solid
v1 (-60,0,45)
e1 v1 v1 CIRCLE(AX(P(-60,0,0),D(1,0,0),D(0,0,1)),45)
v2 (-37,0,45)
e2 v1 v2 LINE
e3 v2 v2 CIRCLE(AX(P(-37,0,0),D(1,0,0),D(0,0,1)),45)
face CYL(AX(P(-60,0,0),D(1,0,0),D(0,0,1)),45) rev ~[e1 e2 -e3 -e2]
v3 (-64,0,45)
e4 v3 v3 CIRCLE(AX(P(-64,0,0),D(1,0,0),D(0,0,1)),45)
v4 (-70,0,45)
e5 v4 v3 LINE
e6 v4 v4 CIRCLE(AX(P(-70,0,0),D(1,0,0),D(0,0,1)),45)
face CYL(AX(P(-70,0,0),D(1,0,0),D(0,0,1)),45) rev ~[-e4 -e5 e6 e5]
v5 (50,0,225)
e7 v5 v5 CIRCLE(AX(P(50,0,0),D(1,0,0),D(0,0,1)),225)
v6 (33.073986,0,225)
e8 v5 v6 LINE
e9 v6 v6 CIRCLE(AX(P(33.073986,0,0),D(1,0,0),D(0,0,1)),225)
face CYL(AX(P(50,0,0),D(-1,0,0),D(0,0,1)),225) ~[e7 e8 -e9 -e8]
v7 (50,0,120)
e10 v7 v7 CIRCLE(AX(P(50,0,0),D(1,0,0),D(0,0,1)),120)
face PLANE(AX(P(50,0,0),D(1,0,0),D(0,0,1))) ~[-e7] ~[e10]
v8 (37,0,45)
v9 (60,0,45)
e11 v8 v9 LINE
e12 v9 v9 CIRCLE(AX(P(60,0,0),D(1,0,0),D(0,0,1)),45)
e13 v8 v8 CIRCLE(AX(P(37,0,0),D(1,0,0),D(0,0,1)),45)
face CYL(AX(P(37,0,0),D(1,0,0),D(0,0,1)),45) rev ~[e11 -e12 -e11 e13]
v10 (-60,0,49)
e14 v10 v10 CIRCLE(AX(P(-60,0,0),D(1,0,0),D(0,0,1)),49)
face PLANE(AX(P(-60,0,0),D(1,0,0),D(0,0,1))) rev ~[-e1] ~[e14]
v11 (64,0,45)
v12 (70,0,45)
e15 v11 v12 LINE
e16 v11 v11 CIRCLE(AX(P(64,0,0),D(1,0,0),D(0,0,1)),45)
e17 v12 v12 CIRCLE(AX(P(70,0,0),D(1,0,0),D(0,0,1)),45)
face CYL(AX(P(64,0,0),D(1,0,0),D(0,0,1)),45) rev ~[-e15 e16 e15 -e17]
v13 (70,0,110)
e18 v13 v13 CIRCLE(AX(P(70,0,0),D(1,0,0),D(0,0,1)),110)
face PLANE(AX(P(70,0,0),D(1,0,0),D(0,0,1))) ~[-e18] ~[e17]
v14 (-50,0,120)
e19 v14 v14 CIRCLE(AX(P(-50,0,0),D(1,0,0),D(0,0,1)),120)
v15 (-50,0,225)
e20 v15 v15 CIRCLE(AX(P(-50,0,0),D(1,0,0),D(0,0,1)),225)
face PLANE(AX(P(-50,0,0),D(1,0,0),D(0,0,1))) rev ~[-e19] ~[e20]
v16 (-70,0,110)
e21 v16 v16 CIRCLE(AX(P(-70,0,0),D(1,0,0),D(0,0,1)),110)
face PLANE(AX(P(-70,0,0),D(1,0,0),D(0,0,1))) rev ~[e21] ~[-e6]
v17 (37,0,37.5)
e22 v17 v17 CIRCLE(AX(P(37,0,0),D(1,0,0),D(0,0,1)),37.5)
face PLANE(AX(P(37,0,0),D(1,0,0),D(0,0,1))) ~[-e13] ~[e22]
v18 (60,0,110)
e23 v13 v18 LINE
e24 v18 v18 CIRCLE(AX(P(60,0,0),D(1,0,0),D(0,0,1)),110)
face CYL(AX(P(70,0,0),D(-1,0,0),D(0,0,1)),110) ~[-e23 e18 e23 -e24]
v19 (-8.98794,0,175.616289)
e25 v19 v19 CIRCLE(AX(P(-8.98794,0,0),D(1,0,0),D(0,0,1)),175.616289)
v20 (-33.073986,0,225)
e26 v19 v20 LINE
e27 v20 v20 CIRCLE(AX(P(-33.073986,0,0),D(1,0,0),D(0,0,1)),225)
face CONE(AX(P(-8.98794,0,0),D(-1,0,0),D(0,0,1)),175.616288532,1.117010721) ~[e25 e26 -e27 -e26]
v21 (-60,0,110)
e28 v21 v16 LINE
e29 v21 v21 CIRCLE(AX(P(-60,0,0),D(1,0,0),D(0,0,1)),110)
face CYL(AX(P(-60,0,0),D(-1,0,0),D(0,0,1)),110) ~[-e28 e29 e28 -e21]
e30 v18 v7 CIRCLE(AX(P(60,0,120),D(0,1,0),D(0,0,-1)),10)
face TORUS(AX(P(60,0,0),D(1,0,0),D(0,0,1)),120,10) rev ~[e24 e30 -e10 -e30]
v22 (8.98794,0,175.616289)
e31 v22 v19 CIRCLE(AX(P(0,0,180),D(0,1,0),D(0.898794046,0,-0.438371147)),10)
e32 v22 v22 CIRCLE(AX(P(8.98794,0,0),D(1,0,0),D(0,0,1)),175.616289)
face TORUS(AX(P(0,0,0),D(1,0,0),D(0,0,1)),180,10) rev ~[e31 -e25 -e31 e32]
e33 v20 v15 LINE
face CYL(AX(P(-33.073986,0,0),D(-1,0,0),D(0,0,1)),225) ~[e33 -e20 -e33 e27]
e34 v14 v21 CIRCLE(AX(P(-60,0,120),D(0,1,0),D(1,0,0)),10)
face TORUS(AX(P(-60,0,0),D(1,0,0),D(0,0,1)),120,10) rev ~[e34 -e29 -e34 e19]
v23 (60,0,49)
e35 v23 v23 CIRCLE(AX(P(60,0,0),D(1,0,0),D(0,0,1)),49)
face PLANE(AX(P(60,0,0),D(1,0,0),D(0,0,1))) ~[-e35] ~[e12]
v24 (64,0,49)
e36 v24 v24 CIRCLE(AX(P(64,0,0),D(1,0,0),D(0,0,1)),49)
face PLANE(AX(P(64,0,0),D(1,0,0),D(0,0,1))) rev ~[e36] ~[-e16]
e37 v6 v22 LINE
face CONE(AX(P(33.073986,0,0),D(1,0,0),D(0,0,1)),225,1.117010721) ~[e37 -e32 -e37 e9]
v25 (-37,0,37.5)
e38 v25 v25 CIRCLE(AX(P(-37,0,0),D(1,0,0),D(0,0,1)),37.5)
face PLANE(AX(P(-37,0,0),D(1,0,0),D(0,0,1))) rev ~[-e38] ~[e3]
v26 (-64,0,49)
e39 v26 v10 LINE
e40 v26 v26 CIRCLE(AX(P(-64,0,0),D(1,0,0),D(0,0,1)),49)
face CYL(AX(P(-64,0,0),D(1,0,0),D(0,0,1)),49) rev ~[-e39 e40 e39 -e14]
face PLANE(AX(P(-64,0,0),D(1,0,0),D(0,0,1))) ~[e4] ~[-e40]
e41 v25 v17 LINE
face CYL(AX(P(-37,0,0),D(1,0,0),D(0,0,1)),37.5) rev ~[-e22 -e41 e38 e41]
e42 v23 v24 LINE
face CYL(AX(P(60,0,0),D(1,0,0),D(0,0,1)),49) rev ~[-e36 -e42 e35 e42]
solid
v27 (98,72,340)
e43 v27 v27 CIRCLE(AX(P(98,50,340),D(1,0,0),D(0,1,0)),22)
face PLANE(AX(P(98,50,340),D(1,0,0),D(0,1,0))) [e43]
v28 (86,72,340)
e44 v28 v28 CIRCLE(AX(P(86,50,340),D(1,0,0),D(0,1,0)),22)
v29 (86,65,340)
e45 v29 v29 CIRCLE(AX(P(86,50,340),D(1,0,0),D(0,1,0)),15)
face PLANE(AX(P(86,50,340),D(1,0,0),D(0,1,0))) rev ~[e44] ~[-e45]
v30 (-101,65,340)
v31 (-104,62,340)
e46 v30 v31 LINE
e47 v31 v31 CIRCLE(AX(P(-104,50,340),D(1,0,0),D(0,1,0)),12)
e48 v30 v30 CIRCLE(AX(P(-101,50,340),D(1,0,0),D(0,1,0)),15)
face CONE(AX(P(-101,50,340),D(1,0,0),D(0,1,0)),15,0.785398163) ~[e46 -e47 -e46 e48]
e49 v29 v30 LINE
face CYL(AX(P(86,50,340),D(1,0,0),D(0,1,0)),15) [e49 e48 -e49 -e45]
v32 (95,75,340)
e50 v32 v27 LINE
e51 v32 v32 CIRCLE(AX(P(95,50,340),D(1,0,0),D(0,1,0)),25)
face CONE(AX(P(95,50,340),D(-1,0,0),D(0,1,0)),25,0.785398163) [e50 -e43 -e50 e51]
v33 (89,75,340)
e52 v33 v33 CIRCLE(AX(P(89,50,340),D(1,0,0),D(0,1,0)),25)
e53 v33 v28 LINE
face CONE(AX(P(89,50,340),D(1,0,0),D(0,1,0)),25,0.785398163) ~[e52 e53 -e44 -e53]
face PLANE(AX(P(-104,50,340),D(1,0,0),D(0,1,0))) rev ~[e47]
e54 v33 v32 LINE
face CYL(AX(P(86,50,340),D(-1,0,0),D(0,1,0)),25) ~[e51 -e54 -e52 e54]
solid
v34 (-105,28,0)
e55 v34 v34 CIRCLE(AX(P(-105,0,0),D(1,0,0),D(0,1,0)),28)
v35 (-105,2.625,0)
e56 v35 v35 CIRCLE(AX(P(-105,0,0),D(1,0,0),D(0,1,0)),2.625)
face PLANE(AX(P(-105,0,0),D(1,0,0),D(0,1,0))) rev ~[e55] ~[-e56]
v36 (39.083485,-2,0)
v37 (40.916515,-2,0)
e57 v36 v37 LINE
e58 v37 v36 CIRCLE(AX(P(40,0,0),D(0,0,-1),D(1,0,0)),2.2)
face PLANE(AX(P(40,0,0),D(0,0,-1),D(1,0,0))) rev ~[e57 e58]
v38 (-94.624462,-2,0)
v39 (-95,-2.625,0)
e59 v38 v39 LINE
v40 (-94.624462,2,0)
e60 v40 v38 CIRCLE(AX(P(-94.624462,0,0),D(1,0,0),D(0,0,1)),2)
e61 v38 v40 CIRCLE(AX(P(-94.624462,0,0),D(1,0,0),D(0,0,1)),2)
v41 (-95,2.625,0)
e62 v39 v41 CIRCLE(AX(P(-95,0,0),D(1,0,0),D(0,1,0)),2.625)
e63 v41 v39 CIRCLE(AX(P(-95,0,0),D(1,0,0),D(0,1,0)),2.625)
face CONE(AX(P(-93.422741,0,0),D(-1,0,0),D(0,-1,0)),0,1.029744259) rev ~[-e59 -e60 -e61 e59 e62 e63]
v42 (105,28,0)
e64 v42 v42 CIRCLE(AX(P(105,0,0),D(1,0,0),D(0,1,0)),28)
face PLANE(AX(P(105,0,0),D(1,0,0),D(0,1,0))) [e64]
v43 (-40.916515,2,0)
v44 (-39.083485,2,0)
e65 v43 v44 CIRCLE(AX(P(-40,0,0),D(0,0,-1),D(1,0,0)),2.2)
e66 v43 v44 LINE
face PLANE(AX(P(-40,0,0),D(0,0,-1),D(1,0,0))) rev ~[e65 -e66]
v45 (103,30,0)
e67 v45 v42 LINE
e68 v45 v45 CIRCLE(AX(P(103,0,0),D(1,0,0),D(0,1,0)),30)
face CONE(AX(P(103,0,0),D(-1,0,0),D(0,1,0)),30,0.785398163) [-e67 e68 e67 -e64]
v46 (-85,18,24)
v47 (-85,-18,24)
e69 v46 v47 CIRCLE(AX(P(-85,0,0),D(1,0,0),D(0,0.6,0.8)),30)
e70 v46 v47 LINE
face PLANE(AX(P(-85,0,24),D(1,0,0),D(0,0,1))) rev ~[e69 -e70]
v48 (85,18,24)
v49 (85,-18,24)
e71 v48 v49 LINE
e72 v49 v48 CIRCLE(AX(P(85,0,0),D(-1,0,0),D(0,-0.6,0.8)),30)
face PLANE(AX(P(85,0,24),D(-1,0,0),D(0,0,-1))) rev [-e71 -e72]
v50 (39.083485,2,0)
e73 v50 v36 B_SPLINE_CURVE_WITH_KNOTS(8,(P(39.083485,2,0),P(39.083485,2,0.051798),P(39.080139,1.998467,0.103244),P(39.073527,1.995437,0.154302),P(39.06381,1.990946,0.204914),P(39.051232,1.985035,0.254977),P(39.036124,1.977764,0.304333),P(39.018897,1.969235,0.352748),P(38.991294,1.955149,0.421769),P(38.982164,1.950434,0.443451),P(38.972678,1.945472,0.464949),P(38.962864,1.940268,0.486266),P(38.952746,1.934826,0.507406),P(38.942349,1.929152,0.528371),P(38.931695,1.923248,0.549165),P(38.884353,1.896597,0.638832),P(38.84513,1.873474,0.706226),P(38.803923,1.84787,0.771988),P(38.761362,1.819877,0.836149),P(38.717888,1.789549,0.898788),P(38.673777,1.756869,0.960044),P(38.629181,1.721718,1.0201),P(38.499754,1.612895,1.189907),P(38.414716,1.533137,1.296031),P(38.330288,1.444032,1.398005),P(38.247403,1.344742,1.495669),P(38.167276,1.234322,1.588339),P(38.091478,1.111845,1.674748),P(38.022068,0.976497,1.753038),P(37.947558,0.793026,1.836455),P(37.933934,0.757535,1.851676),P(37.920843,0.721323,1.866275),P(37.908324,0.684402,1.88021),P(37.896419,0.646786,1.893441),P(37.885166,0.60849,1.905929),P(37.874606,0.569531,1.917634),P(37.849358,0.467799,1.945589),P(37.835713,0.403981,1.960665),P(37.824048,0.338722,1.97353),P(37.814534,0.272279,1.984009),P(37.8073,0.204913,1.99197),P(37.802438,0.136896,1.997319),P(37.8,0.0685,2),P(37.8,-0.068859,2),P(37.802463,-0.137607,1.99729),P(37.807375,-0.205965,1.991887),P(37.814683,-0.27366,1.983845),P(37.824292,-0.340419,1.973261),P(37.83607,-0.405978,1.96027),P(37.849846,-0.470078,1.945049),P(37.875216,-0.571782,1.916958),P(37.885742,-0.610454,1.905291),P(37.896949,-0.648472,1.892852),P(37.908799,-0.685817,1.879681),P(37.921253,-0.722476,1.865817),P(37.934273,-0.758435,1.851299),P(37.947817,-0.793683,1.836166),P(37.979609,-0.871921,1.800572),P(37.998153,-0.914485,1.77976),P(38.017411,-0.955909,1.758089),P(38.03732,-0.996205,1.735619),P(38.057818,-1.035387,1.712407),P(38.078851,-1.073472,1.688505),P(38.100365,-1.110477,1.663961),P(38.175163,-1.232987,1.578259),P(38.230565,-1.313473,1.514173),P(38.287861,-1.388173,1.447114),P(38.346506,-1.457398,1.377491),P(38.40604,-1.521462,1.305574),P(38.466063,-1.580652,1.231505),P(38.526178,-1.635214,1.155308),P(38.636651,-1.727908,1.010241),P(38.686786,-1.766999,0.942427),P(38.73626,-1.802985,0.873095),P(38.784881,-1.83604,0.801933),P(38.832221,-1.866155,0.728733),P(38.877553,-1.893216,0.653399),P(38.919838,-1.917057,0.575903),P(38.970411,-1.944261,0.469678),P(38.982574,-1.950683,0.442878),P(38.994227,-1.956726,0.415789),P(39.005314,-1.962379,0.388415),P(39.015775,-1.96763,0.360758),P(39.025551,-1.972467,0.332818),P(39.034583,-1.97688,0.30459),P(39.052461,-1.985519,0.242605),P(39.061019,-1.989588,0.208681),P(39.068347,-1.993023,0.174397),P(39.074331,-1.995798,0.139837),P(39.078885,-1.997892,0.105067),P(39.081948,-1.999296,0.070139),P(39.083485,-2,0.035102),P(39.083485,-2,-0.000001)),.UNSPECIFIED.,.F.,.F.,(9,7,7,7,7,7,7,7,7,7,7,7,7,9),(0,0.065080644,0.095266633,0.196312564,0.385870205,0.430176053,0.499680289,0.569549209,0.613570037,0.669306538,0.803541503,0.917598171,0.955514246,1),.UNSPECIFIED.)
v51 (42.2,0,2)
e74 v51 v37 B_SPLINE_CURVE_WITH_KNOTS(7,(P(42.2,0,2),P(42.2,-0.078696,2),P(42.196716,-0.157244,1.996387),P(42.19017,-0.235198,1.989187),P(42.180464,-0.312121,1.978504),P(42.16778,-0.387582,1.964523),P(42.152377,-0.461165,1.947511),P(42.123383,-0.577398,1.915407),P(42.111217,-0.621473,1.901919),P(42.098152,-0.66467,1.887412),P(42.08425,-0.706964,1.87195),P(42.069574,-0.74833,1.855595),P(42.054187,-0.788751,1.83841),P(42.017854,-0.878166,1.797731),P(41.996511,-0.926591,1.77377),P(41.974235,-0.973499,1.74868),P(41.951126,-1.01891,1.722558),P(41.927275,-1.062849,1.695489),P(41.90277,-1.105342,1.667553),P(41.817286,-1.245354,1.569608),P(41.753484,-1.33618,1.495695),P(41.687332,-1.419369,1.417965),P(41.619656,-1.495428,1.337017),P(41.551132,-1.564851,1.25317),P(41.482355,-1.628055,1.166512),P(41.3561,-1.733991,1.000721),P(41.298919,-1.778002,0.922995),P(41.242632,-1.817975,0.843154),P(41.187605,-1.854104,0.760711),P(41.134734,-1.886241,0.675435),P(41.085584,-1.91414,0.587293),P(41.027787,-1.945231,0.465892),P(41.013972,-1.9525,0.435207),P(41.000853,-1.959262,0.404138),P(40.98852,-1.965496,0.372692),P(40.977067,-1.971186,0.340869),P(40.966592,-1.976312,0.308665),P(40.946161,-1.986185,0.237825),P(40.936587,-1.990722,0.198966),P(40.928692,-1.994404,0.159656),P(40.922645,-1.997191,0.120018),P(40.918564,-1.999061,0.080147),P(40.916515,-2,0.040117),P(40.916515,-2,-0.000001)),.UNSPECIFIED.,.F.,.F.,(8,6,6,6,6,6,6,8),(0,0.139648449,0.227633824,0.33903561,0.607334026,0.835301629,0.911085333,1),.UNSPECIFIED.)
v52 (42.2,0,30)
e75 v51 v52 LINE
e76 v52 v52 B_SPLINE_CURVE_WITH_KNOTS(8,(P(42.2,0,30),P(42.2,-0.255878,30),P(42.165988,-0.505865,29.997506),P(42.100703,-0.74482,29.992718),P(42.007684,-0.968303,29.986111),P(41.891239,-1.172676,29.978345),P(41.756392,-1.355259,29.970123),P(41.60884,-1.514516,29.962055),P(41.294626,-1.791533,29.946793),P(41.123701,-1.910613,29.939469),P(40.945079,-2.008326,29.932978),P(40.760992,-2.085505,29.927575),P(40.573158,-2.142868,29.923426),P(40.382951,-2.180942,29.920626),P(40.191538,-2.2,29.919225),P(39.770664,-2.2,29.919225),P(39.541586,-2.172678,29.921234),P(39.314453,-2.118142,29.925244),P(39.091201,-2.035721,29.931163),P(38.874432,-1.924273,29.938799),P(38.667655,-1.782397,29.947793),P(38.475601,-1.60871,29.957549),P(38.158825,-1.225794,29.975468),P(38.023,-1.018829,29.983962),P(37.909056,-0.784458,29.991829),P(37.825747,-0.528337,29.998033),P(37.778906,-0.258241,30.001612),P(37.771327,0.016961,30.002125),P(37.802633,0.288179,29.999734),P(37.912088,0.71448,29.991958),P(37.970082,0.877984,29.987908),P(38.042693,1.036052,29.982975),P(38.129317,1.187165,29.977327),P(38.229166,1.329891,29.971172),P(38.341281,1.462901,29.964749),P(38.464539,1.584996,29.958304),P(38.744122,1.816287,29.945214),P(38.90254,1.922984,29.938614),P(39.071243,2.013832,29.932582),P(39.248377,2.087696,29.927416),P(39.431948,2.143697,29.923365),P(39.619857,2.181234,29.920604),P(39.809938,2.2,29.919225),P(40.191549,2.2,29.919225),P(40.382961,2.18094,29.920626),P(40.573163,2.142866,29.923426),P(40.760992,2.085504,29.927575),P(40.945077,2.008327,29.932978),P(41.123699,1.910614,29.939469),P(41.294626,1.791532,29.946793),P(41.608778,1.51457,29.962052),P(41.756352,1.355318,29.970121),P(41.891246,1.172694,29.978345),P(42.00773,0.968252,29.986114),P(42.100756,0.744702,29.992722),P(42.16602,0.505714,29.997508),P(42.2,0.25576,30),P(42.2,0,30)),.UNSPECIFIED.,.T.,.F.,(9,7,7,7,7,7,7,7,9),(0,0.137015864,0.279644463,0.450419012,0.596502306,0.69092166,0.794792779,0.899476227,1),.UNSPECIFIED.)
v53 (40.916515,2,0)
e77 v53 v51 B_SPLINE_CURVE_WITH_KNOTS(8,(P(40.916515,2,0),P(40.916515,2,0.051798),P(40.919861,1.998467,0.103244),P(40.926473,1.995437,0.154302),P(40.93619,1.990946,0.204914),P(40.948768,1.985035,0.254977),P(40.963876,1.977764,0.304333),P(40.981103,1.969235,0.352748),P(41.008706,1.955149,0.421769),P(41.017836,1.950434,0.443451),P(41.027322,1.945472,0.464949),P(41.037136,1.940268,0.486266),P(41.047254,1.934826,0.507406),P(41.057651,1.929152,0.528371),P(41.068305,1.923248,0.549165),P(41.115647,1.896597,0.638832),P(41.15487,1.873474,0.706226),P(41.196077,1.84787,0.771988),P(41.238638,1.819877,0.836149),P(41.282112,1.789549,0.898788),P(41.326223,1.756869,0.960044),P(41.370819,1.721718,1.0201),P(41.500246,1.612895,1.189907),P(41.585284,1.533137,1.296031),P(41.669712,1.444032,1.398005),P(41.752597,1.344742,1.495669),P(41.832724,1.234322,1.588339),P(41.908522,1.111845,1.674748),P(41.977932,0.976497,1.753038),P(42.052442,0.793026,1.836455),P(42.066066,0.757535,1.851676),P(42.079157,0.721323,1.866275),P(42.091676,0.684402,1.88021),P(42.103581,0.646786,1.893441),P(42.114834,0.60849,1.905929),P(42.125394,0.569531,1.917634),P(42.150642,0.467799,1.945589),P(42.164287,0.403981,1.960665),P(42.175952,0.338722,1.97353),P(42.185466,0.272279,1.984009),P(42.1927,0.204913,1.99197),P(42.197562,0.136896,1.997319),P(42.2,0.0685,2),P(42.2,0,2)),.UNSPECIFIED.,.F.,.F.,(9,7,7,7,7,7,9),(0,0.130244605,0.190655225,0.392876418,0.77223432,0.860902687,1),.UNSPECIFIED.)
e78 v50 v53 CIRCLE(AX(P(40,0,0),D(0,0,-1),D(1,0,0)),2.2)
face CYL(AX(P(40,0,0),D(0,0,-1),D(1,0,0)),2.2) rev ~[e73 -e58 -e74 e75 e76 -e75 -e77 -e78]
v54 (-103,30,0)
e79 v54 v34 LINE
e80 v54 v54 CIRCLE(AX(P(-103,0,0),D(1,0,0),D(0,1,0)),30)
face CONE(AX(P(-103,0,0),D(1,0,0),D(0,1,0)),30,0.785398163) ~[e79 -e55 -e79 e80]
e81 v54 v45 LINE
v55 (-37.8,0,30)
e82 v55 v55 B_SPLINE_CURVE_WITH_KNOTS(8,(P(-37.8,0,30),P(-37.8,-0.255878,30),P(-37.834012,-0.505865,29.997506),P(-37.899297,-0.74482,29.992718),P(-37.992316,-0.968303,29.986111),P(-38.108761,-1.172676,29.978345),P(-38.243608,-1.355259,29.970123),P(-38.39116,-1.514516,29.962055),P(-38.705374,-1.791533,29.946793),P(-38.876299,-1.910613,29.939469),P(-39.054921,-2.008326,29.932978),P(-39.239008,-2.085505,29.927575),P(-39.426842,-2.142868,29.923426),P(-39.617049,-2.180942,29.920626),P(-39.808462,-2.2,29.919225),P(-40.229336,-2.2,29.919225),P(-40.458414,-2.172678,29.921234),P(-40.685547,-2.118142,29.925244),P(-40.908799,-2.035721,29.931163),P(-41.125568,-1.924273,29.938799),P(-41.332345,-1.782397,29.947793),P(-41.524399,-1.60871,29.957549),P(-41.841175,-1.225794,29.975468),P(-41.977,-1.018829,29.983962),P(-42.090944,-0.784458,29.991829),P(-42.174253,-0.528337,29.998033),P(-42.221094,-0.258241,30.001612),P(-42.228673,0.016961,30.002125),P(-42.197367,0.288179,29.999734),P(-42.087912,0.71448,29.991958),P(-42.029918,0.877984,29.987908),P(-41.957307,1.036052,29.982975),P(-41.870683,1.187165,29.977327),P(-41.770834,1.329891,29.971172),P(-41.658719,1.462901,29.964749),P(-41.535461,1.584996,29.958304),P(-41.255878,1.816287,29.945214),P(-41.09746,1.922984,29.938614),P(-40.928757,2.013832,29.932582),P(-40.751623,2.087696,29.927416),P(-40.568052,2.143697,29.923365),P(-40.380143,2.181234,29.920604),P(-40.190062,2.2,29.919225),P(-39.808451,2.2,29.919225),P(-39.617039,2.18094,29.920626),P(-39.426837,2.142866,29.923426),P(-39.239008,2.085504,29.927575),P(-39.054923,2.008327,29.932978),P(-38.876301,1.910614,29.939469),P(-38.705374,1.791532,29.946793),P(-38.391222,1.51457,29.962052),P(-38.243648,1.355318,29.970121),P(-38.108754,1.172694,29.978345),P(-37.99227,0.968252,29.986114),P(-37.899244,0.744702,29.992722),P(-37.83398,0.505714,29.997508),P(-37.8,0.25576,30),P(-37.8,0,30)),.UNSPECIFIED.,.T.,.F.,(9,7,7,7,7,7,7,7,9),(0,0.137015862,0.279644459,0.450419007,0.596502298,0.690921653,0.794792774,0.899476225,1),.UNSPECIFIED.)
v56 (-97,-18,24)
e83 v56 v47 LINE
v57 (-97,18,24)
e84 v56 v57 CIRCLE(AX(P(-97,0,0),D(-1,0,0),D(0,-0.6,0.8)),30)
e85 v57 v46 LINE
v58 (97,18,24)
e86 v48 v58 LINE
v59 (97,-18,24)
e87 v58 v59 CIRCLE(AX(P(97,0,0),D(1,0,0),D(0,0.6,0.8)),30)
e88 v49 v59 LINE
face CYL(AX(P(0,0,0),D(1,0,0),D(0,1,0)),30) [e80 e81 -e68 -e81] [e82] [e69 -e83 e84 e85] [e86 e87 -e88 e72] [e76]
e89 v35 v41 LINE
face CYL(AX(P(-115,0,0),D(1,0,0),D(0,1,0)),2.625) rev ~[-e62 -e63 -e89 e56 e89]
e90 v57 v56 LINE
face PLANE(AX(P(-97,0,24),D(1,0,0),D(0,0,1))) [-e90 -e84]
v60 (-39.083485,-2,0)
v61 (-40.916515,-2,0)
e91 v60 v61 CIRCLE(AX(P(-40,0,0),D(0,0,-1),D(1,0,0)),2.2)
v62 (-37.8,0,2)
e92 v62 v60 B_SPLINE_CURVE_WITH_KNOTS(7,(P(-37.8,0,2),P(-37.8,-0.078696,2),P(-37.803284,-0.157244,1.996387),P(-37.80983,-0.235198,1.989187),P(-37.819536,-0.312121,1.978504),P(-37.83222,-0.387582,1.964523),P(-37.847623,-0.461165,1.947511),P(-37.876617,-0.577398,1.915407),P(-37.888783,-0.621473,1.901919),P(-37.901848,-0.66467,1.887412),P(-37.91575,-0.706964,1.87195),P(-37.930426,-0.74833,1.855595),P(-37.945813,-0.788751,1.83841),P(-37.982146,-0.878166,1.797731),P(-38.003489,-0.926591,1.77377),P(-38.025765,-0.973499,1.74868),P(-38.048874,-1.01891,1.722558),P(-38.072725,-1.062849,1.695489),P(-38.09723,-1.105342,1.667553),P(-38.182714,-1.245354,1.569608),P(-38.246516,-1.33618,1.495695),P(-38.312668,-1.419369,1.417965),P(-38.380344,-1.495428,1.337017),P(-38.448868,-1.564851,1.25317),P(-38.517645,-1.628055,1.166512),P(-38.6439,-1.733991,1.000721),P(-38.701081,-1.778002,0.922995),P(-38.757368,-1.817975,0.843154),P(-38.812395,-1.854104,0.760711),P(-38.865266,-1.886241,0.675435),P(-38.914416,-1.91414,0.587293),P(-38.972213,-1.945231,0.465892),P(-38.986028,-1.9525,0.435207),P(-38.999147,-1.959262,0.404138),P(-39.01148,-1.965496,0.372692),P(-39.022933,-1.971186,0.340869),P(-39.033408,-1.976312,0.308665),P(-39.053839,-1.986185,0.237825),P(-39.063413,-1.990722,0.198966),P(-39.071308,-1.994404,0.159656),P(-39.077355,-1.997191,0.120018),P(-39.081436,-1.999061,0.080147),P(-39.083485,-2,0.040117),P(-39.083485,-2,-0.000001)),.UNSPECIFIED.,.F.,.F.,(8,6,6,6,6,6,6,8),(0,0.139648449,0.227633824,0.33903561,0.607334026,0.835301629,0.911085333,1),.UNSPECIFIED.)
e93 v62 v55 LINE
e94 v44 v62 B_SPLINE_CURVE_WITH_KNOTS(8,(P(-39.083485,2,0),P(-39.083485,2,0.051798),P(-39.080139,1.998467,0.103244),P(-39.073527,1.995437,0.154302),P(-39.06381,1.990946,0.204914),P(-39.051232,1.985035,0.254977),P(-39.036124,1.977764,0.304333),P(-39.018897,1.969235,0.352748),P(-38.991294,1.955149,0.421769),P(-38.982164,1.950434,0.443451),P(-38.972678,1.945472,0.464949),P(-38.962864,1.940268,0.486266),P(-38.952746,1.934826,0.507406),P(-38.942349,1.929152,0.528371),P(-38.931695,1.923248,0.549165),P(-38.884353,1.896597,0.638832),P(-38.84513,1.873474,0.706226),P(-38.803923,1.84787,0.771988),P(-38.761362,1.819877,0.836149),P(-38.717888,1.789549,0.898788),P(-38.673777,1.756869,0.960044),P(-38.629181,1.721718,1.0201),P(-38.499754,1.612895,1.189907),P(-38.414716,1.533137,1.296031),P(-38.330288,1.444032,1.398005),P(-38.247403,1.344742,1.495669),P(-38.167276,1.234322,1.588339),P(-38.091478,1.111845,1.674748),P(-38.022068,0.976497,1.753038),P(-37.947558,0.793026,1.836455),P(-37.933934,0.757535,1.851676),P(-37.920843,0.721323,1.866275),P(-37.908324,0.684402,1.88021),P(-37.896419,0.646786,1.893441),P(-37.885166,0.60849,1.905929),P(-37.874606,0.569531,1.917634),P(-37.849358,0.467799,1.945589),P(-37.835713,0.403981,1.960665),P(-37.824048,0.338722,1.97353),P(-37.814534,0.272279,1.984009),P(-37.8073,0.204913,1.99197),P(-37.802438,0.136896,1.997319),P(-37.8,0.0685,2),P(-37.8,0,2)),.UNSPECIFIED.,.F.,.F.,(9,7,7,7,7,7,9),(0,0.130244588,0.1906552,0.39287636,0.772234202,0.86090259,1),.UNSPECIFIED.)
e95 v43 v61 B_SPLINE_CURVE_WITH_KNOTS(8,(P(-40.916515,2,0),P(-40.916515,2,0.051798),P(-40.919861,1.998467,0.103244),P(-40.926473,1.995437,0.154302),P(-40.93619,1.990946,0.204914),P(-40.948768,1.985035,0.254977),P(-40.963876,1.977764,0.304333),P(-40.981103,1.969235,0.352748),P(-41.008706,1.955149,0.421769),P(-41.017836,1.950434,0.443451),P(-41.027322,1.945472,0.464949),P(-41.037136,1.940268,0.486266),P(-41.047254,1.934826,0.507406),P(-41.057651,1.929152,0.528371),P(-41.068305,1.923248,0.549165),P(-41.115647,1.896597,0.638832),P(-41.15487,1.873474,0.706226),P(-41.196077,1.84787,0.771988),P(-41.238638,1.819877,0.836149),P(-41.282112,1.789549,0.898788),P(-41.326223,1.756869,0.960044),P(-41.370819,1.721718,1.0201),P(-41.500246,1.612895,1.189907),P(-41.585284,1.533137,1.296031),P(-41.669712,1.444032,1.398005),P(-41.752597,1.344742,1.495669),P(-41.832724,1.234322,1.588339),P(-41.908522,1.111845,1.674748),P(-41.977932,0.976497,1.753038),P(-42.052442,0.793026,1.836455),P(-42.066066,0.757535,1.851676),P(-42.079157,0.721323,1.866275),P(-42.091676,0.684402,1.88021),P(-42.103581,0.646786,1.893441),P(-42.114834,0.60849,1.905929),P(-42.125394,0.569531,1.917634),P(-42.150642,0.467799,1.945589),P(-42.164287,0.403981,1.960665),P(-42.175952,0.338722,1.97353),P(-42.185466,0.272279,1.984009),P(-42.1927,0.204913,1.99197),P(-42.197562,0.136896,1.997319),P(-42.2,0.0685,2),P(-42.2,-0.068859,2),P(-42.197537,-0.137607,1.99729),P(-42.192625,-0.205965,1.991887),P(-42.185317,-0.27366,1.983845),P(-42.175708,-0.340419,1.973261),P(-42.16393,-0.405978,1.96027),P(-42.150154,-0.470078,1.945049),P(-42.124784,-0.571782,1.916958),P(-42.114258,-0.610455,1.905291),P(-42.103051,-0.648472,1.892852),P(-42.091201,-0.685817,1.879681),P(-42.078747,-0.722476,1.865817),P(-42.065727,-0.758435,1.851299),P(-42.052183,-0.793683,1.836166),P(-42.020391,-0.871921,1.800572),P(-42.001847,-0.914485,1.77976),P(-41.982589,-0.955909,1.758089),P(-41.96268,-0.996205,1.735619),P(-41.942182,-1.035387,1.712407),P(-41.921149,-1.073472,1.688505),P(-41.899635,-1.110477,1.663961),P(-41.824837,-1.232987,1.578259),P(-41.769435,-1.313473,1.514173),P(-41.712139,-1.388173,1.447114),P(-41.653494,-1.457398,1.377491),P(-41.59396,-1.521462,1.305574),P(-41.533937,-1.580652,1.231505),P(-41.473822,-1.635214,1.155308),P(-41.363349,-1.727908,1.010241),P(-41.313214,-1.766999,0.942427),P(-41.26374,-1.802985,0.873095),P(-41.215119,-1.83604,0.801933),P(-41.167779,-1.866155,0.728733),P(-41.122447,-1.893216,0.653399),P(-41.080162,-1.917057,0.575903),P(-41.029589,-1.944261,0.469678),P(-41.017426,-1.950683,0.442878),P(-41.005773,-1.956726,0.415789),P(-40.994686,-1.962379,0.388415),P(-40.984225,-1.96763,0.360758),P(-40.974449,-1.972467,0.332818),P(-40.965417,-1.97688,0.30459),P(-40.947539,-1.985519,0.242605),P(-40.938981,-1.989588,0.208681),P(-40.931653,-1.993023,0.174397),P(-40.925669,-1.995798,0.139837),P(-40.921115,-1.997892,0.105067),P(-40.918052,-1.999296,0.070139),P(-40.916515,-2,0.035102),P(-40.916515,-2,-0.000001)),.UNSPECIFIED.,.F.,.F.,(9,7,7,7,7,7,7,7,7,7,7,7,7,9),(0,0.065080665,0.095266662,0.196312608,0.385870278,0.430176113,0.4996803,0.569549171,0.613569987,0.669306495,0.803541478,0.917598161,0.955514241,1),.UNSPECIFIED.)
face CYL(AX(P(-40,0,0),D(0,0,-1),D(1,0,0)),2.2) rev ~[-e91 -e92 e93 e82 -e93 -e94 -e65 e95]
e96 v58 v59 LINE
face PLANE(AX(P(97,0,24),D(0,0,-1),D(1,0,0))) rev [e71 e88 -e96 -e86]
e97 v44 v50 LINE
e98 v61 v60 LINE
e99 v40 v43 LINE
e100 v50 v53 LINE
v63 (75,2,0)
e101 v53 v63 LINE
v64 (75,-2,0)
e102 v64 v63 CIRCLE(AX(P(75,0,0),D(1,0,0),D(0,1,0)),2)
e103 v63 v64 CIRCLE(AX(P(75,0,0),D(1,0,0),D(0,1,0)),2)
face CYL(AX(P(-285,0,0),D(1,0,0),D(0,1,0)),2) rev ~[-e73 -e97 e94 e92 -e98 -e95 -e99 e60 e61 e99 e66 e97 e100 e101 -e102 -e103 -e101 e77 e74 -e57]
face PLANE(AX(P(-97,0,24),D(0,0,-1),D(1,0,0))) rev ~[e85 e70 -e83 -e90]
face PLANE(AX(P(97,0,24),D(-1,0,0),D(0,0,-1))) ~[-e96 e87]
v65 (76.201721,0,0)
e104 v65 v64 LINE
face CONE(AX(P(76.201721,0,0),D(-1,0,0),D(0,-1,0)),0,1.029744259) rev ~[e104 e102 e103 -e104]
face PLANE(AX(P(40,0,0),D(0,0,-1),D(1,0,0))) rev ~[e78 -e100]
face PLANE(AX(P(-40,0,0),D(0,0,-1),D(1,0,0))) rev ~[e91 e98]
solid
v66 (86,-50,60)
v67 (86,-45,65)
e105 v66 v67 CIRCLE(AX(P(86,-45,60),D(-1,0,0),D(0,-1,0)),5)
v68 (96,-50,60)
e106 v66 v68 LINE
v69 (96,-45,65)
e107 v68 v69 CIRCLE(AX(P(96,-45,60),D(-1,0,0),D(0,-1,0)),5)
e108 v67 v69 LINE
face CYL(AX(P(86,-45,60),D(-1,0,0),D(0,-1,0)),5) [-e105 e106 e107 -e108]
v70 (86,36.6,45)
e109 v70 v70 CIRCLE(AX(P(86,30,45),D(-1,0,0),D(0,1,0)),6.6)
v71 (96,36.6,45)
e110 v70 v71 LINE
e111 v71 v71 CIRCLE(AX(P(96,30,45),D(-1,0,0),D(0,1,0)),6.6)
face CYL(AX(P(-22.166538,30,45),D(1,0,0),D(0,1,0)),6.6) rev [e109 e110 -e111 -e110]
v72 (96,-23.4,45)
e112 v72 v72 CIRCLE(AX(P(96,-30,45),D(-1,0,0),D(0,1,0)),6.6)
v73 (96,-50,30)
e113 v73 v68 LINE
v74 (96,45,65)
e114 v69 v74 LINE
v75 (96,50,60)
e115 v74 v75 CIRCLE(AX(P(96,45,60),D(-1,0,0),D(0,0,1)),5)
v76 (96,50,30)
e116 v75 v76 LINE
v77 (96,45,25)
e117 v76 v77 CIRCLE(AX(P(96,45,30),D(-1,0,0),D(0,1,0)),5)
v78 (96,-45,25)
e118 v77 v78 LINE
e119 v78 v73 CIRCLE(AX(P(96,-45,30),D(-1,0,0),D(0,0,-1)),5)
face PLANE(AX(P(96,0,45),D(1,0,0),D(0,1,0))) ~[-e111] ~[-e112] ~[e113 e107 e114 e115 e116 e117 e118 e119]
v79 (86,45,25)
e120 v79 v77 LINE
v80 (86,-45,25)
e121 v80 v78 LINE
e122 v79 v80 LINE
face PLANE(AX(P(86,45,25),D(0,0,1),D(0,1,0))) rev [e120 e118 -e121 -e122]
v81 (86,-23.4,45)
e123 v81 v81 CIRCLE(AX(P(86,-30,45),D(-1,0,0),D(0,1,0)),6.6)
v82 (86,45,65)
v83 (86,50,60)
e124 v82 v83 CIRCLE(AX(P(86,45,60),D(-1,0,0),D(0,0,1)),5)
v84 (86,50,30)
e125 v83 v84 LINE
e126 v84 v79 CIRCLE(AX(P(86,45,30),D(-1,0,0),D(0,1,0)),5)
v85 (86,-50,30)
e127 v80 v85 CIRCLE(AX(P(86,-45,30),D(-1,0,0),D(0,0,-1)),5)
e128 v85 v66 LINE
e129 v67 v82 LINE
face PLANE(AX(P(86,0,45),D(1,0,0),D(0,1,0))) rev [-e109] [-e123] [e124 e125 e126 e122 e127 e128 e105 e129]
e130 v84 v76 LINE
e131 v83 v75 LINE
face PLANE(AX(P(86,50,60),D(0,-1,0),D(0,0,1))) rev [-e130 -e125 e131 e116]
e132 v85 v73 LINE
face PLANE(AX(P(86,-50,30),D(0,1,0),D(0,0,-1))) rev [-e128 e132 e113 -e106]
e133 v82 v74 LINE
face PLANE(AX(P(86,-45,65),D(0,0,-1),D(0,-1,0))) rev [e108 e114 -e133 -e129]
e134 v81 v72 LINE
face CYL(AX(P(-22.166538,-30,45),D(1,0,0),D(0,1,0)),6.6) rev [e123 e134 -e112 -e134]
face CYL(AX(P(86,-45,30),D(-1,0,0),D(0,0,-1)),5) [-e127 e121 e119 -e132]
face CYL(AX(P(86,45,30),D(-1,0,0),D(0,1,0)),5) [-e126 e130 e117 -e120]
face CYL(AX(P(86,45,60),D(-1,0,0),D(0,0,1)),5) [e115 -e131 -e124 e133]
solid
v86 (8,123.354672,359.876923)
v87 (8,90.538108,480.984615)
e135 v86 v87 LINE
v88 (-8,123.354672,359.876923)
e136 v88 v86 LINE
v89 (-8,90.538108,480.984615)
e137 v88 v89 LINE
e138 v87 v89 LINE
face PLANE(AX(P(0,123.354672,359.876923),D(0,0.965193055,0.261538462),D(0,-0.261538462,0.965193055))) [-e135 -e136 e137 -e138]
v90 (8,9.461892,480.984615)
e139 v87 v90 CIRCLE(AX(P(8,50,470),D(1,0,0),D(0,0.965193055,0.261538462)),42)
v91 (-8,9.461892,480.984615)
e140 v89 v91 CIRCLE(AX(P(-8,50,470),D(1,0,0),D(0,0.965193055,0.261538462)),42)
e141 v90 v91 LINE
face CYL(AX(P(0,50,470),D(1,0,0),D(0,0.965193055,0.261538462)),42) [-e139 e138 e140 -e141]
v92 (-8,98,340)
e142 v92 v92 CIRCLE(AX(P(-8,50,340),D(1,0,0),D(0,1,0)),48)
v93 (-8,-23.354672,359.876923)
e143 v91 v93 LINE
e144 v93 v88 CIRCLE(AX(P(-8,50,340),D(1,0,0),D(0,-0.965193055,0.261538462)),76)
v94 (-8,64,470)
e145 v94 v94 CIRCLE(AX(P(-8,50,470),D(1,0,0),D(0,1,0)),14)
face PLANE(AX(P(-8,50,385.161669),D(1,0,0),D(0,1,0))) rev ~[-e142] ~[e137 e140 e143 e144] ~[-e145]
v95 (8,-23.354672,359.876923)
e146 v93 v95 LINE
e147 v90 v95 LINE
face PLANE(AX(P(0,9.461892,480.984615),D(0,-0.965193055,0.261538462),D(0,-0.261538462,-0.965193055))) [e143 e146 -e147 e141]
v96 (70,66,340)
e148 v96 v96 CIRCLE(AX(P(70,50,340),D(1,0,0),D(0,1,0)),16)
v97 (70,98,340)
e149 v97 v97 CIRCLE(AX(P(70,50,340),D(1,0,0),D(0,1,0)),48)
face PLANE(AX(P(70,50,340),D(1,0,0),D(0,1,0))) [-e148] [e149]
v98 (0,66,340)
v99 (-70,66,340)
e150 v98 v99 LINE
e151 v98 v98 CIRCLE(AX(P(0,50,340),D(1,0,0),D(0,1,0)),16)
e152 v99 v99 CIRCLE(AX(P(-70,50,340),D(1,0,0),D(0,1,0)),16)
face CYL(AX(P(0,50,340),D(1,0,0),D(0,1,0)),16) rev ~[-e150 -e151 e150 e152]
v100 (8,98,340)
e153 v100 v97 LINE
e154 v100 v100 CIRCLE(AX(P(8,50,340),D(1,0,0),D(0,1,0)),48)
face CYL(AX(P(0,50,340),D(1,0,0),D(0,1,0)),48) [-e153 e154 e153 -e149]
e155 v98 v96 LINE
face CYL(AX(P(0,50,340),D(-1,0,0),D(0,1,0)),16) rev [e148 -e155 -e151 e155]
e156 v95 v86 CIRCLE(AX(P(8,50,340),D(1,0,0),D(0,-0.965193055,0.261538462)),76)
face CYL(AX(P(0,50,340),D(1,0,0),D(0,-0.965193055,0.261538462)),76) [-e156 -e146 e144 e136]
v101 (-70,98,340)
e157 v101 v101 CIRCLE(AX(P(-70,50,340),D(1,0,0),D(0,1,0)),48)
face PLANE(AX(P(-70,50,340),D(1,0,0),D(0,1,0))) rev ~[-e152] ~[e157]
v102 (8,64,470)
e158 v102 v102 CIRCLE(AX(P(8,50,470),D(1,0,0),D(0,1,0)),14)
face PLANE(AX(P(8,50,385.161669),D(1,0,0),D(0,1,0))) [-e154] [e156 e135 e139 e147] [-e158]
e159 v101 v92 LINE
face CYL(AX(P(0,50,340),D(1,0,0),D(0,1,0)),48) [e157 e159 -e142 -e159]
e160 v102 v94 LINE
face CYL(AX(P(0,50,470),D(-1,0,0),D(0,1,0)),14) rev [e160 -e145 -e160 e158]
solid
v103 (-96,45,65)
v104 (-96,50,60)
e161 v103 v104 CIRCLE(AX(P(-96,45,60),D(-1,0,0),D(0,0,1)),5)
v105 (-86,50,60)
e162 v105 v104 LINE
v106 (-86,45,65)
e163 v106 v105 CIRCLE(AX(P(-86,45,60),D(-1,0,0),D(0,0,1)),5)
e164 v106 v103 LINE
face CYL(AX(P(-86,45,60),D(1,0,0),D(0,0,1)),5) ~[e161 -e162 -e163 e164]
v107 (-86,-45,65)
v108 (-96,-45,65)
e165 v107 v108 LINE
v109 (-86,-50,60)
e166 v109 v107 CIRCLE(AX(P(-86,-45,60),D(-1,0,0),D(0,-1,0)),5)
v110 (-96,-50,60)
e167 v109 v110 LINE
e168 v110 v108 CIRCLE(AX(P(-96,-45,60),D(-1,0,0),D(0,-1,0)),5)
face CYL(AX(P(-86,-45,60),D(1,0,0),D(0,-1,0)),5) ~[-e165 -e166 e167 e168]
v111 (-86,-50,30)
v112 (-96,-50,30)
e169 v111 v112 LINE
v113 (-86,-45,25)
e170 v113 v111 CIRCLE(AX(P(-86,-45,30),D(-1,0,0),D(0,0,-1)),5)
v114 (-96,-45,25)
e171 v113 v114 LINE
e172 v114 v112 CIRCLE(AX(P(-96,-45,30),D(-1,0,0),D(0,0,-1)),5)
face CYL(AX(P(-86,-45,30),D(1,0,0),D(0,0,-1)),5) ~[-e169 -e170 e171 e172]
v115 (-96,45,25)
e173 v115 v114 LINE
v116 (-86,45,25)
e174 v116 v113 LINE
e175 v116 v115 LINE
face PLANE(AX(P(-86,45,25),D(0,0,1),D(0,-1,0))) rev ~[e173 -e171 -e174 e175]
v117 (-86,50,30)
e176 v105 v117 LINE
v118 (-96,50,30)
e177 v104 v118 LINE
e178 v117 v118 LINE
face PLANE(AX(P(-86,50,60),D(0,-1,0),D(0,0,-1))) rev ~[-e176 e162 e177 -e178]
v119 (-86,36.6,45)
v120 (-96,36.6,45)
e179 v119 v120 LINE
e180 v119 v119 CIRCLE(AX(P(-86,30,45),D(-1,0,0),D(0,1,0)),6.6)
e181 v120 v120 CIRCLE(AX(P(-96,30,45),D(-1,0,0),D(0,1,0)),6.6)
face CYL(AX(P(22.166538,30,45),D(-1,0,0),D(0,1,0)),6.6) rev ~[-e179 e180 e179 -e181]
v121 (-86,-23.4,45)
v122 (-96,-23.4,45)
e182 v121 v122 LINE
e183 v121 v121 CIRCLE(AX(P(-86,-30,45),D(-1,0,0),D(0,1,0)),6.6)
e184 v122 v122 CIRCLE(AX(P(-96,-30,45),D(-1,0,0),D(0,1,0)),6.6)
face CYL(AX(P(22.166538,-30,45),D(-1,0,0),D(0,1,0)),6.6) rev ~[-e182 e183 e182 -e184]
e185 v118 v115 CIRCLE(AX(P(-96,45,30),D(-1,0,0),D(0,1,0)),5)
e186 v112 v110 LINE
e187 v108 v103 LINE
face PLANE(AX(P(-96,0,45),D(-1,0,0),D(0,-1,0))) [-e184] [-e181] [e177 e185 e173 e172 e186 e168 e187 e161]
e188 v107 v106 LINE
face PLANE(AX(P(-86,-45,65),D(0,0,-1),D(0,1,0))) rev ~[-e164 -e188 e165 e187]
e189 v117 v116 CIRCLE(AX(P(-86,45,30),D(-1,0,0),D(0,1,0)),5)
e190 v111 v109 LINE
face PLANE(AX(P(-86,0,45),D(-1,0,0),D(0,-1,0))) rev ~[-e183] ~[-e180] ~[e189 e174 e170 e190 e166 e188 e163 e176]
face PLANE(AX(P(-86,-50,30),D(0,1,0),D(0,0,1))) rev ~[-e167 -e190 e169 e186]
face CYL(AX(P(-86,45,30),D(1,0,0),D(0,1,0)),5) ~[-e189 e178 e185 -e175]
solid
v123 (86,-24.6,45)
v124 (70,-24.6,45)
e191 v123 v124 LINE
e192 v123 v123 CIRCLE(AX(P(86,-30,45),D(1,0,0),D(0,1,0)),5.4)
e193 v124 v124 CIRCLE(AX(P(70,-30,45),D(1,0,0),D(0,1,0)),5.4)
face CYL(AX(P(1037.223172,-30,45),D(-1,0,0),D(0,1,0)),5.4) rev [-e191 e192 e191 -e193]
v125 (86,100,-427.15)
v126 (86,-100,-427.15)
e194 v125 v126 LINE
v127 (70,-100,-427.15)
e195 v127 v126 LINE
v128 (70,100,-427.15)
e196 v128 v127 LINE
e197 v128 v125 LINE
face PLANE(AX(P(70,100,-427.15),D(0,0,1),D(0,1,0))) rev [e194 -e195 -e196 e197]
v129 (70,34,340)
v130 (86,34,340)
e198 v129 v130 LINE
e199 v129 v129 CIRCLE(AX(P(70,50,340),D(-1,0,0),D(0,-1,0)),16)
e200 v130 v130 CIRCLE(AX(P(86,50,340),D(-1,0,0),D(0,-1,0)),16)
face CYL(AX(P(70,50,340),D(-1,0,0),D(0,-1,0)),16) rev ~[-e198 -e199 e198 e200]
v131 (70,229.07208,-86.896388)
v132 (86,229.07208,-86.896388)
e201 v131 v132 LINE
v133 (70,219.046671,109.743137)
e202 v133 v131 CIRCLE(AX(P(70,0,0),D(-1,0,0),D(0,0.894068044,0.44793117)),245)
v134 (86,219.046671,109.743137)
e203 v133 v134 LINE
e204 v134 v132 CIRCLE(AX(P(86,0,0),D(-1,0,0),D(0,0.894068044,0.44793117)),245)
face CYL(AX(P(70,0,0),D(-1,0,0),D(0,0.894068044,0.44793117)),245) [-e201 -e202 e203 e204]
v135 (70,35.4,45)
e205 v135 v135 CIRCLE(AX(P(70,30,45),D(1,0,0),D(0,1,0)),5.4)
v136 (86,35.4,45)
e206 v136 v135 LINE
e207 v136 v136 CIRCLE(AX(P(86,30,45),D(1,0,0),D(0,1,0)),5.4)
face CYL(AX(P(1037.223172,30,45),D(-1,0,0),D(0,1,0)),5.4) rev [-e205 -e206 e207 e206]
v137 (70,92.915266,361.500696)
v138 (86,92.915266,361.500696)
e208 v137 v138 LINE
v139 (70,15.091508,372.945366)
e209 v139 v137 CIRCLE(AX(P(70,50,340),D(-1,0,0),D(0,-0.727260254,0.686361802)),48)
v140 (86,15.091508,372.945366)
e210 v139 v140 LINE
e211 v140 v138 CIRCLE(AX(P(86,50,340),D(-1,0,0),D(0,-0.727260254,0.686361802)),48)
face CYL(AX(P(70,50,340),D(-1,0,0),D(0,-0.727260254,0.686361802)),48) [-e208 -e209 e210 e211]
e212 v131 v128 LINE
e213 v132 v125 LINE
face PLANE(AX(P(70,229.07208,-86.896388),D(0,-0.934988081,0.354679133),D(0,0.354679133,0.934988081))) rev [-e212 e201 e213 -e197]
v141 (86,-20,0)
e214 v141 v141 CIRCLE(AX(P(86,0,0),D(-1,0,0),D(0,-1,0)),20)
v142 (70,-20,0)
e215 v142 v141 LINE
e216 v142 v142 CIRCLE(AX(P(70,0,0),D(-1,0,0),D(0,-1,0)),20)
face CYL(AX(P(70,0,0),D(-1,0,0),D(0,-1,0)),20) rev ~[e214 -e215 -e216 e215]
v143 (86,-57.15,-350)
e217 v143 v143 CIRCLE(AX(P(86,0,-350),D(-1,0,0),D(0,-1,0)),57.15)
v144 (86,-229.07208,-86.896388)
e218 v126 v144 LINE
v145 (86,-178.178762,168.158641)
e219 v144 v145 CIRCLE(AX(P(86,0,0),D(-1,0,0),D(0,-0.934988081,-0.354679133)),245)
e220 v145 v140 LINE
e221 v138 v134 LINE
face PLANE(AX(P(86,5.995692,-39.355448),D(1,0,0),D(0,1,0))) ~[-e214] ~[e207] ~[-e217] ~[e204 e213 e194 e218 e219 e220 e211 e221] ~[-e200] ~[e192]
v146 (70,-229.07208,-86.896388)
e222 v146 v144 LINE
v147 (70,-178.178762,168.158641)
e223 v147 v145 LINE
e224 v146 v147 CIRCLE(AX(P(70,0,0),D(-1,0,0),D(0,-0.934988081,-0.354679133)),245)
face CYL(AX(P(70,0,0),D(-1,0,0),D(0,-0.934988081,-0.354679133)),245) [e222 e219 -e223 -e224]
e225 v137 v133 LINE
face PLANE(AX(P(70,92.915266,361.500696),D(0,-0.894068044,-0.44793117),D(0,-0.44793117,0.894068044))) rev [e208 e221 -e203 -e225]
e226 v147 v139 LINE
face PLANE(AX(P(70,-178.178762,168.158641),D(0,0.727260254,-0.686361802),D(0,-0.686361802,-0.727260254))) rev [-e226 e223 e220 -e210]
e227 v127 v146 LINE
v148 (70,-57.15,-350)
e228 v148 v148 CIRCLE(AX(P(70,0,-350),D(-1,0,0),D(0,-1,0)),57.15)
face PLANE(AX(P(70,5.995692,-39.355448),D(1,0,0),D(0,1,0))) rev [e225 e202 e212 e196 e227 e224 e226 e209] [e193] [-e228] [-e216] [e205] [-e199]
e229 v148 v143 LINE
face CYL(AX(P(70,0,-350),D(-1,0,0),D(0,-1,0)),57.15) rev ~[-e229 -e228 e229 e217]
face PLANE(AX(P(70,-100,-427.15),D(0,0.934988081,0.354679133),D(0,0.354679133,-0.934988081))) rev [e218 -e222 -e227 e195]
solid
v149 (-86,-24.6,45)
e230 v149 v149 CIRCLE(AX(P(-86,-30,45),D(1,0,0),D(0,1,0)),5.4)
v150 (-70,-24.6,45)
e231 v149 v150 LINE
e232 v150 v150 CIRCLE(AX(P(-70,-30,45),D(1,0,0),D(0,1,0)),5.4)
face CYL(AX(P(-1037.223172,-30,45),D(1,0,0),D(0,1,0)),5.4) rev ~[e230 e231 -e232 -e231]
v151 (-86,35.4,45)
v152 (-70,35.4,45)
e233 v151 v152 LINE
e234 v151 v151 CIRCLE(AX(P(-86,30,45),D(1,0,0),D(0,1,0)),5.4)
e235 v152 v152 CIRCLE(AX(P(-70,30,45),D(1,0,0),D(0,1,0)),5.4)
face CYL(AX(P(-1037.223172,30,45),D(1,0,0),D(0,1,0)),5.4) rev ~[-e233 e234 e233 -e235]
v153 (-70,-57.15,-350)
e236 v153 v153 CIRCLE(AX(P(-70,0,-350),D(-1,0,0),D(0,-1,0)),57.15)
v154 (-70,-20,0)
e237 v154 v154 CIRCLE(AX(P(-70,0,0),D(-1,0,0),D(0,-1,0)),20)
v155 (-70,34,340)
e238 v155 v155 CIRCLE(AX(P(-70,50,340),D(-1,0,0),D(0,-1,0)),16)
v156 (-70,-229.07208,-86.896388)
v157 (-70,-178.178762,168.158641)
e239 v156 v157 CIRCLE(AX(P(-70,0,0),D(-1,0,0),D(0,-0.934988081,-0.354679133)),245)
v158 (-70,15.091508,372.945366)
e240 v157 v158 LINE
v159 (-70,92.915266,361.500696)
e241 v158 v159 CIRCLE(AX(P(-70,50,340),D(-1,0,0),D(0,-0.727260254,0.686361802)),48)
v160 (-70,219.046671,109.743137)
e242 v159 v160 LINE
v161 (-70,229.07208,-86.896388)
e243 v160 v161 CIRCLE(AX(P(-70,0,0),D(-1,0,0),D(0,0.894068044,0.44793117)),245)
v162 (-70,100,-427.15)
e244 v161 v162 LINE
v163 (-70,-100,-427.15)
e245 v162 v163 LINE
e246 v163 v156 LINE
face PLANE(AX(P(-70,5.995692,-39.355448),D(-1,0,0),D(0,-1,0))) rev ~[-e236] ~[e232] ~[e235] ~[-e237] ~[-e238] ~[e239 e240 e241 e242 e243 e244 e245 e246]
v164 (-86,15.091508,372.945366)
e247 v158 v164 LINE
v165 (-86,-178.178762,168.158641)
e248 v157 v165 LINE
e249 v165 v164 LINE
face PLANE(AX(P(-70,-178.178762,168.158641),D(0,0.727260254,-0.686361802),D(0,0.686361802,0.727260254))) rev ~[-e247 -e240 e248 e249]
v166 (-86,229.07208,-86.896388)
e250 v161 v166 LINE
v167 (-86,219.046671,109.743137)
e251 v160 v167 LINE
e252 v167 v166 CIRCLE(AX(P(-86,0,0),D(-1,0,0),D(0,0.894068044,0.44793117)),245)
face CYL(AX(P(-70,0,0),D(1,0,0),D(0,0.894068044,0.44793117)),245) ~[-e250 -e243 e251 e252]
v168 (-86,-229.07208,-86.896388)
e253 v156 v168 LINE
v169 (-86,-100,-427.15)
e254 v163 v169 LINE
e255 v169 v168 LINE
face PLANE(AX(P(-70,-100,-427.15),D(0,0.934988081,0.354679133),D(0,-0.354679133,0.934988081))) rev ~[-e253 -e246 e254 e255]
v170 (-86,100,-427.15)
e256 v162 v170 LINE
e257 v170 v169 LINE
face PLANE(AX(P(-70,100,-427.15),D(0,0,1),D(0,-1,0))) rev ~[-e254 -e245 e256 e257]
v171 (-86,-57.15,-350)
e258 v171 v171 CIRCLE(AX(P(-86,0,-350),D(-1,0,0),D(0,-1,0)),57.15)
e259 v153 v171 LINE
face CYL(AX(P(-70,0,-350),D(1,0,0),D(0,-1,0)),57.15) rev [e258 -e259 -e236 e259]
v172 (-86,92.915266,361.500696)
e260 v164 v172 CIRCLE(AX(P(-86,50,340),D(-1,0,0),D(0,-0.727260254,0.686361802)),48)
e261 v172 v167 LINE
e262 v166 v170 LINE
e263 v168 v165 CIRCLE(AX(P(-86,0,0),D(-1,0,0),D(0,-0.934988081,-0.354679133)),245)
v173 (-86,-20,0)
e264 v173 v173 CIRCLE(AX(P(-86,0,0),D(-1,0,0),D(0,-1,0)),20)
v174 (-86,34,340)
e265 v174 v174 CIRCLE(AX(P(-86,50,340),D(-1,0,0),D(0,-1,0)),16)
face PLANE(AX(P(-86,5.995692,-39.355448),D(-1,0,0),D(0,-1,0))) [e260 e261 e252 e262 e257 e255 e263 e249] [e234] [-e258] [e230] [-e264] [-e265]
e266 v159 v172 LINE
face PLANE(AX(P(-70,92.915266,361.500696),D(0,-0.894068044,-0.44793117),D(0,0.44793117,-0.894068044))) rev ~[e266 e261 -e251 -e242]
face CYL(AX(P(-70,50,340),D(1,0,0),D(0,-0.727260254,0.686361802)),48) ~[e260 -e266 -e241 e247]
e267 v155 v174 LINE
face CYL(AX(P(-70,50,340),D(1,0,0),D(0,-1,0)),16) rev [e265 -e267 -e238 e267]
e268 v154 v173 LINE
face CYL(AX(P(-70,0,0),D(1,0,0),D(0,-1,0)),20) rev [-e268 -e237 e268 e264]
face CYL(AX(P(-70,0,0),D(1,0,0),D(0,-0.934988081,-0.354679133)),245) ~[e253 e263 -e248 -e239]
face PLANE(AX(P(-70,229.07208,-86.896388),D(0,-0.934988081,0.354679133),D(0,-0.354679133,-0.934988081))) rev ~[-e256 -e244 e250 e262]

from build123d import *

# Parameters (mm, degrees)
F3_R           = 57.15
F3_R_2         = 16
F3_R_3         = 110
F3_R_4         = 45
F3_R_5         = 20
F4_DEPTH       = 16
F6_DEPTH       = 10
F7_D           = 10.8
F8_D           = 13.2
F9_R           = 30
F10_DEPTH      = 105
F11_SIZE       = 2
F12_W          = 12
F12_H          = 6
F13_DEPTH      = 50
F15_D          = 4
F15_DEPTH      = 180
F15_TIP        = 1.2017212381
F16_D          = 5.25
F16_DEPTH      = 10
F16_TIP        = 1.5772591249
F18_D          = 4.4
F18_DEPTH      = 30.001
F9_R_2         = 48
F9_R_3         = 16
F20_DEPTH      = 70
F20_DEPTH_BACK = 70
F9_R_4         = 14
F21_DEPTH      = 8
F22_R          = 15
F23_DEPTH      = 190
F22_R_2        = 25
F22_R_3        = 16
F24_DEPTH      = 12
F25_SIZE       = 3


# Not quite as in the source:
# - a pattern or mirror of a feature is missing from the dataset's text; its kind, count and spacing are read off the source's solid
# - a feature names something its author has since deleted; it is built from what else it names


with BuildPart() as f2:
    # F1 (on Front) → F2 (revolve)
    with BuildSketch(Plane.XZ):
        with BuildLine():
            Line((-70, 110), (-70, 45))
            Line((-70, 45), (-64, 45))
            Line((-64, 45), (-64, 49))
            Line((-64, 49), (-60, 49))
            Line((-60, 49), (-60, 45))
            Line((-60, 45), (-37, 45))
            Line((-37, 45), (-37, 37.5))
            Line((-37, 37.5), (37, 37.5))
            Line((37, 37.5), (37, 45))
            Line((37, 45), (60, 45))
            Line((60, 45), (60, 49))
            Line((60, 49), (64, 49))
            Line((64, 49), (64, 45))
            Line((64, 45), (70, 45))
            Line((70, 45), (70, 110))
            Line((70, 110), (60, 110))
            ThreePointArc((60, 110), (52.9289321881, 112.9289321881), (50, 120))
            Line((50, 120), (50, 225))
            Line((50, 225), (33.0739858902, 225))
            Line((33.0739858902, 225), (8.987940463, 175.6162885321))
            ThreePointArc((8.987940463, 175.6162885321), (0, 170), (-8.987940463, 175.6162885321))
            Line((-8.987940463, 175.6162885321), (-33.0739858902, 225))
            Line((-33.0739858902, 225), (-50, 225))
            Line((-50, 225), (-50, 120))
            ThreePointArc((-50, 120), (-52.9289321881, 112.9289321881), (-60, 110))
            Line((-60, 110), (-70, 110))
        make_face()
    revolve(axis=Axis((0, 0, 0), (1, 0, 0)))


with BuildPart() as f4:
    # F3 (on face) → F4 (new body)
    with BuildSketch(Plane(origin=(-70, 0, 0), x_dir=(0, -1, 0), z_dir=(-1, 0, 0))):
        with BuildLine():
            Line((-92.9152661016, 361.5006961615), (-219.0466707268, 109.7431366578))
            ThreePointArc((-219.0466707268, 109.7431366578), (-244.6822006361, 12.4748022789), (-229.072079932, -86.8963877017))
            Line((-229.072079932, -86.8963877017), (-100, -427.15))
            Line((-100, -427.15), (100, -427.15))
            Line((100, -427.15), (229.072079932, -86.8963877017))
            ThreePointArc((229.072079932, -86.8963877017), (240.2635616963, 47.9418493701), (178.1787621747, 168.1586414963))
            Line((178.1787621747, 168.1586414963), (-15.0915078188, 372.9453664972))
            ThreePointArc((-15.0915078188, 372.9453664972), (-56.9837115438, 387.4892384975), (-92.9152661016, 361.5006961615))
        make_face()
        with Locations((0, -350)):
            Circle(F3_R, mode=Mode.SUBTRACT)
        with Locations((-50, 340)):
            Circle(F3_R_2, mode=Mode.SUBTRACT)
        Circle(F3_R_3, mode=Mode.SUBTRACT)
        Circle(F3_R_3)
        Circle(F3_R_4, mode=Mode.SUBTRACT)
        Circle(F3_R_4)
        Circle(F3_R_5, mode=Mode.SUBTRACT)
    extrude(amount=F4_DEPTH)

    # F7 (through all)
    with Locations(Plane(origin=(-86, 0, 0), x_dir=(0, -1, 0), z_dir=(-1, 0, 0))):
        with Locations((-30, 45), (30, 45)):
            Hole(F7_D / 2)


with BuildPart() as f6:
    # F5 (on face) → F6 (new body)
    with BuildSketch(Plane(origin=(-86, 0, 0), x_dir=(0, -1, 0), z_dir=(-1, 0, 0))):
        with BuildLine():
            Line((45, 65), (-45, 65))
            ThreePointArc((-45, 65), (-48.5355339059, 63.5355339059), (-50, 60))
            Line((-50, 60), (-50, 30))
            ThreePointArc((-50, 30), (-48.5355339059, 26.4644660941), (-45, 25))
            Line((-45, 25), (45, 25))
            ThreePointArc((45, 25), (48.5355339059, 26.4644660941), (50, 30))
            Line((50, 30), (50, 60))
            ThreePointArc((50, 60), (48.5355339059, 63.5355339059), (45, 65))
        make_face()
    extrude(amount=F6_DEPTH)

    # F8 (through all)
    with Locations(Plane(origin=(-86, 0, 0), x_dir=(0, -1, 0), z_dir=(1, 0, 0))):
        with Locations((-30, -45), (30, -45)):
            Hole(F8_D / 2)


with BuildPart() as f10:
    # F9 (on Right) → F10 (new body, symmetric)
    with BuildSketch(Plane.YZ):
        Circle(F9_R)
    extrude(amount=F10_DEPTH, both=True)

    # F11
    f11_edges = [f10.edges().sort_by_distance(p)[0] for p in [
        (-105, -30, 0),
        (105, -30, 0),
    ]]
    chamfer(f11_edges, length=F11_SIZE)

    # F12 (on Front) → F13 (cut, symmetric)
    with BuildSketch(Plane.XZ):
        with Locations((-91, 27)):
            Rectangle(F12_W, F12_H)
    f13 = extrude(amount=F13_DEPTH, both=True, mode=Mode.SUBTRACT)

    # F13_copies: F13 across plane
    add(f13.mirror(Plane(origin=(0, 0, 0), x_dir=(0, 0, 1), z_dir=(1, 0, 0))), mode=Mode.SUBTRACT)

    # F15
    with Locations(Plane(origin=(-105, 0, 0), x_dir=(0, -1, 0), z_dir=(-1, 0, 0))):
        with Locations((0, 0)):
            Hole(F15_D / 2, depth=F15_DEPTH)
            with Locations((0, 0, -(F15_DEPTH + F15_TIP / 2))):  # 118° drill point
                Cone(0, F15_D / 2, F15_TIP, mode=Mode.SUBTRACT)

    # F16
    with Locations(Plane(origin=(-105, 0, 0), x_dir=(0, -1, 0), z_dir=(-1, 0, 0))):
        with Locations((0, 0)):
            Hole(F16_D / 2, depth=F16_DEPTH)
            with Locations((0, 0, -(F16_DEPTH + F16_TIP / 2))):  # 118° drill point
                Cone(0, F16_D / 2, F16_TIP, mode=Mode.SUBTRACT)

    # F18 (through all, one way)
    with BuildSketch(Plane(origin=(0, 0, 0), x_dir=(1, 0, 0), z_dir=(0, 0, -1))):
        with Locations((-40, 0), (40, 0)):
            Circle(F18_D / 2)
    extrude(amount=-F18_DEPTH, mode=Mode.SUBTRACT)


with BuildPart() as f19_1:
    # F19: instance of F4
    add(f4.part.mirror(Plane.YZ))


with BuildPart() as f19_2:
    # F19: instance of F6
    add(f6.part.mirror(Plane.YZ))


with BuildPart() as f20:
    # F9 (on Right) → F20 (new body, two sides)
    with BuildSketch(Plane.YZ) as f20_sk:
        with Locations((50, 340)):
            Circle(F9_R_2)
        with Locations((50, 340)):
            Circle(F9_R_3, mode=Mode.SUBTRACT)
    extrude(amount=F20_DEPTH)
    extrude(f20_sk.sketch, amount=-F20_DEPTH_BACK)

    # F9 (on Right) → F21 (join, symmetric)
    with BuildSketch(Plane.YZ):
        with BuildLine():
            Line((9.4618916962, 480.9846153846), (-23.3546721688, 359.8769230769))
            ThreePointArc((-23.3546721688, 359.8769230769), (50, 264), (123.3546721688, 359.8769230769))
            Line((123.3546721688, 359.8769230769), (90.5381083038, 480.9846153846))
            ThreePointArc((90.5381083038, 480.9846153846), (50, 512), (9.4618916962, 480.9846153846))
        make_face()
        with Locations((50, 340)):
            Circle(F9_R_2, mode=Mode.SUBTRACT)
        with Locations((50, 470)):
            Circle(F9_R_4, mode=Mode.SUBTRACT)
    extrude(amount=F21_DEPTH, both=True)


with BuildPart() as f23:
    # F22 (on face) → F23 (new body)
    with BuildSketch(Plane.YZ.offset(86)):
        with Locations((50, 340)):
            Circle(F22_R)
    extrude(amount=-F23_DEPTH)

    # F22 (on face) → F24 (join)
    with BuildSketch(Plane.YZ.offset(86)):
        with Locations((50, 340)):
            Circle(F22_R_2)
        with Locations((50, 340)):
            Circle(F22_R_3, mode=Mode.SUBTRACT)
        with Locations((50, 340)):
            Circle(F22_R_3)
        with Locations((50, 340)):
            Circle(F22_R, mode=Mode.SUBTRACT)
        with Locations((50, 340)):
            Circle(F22_R)
    extrude(amount=F24_DEPTH)

    # F25
    f25_edges = [f23.edges().sort_by_distance(p)[0] for p in [
        (98, 25, 340),
        (86, 25, 340),
        (-104, 35, 340),
    ]]
    chamfer(f25_edges, length=F25_SIZE)


solid = Compound([f2.part, f4.part, f6.part, f10.part, f19_1.part, f19_2.part, f20.part, f23.part])
